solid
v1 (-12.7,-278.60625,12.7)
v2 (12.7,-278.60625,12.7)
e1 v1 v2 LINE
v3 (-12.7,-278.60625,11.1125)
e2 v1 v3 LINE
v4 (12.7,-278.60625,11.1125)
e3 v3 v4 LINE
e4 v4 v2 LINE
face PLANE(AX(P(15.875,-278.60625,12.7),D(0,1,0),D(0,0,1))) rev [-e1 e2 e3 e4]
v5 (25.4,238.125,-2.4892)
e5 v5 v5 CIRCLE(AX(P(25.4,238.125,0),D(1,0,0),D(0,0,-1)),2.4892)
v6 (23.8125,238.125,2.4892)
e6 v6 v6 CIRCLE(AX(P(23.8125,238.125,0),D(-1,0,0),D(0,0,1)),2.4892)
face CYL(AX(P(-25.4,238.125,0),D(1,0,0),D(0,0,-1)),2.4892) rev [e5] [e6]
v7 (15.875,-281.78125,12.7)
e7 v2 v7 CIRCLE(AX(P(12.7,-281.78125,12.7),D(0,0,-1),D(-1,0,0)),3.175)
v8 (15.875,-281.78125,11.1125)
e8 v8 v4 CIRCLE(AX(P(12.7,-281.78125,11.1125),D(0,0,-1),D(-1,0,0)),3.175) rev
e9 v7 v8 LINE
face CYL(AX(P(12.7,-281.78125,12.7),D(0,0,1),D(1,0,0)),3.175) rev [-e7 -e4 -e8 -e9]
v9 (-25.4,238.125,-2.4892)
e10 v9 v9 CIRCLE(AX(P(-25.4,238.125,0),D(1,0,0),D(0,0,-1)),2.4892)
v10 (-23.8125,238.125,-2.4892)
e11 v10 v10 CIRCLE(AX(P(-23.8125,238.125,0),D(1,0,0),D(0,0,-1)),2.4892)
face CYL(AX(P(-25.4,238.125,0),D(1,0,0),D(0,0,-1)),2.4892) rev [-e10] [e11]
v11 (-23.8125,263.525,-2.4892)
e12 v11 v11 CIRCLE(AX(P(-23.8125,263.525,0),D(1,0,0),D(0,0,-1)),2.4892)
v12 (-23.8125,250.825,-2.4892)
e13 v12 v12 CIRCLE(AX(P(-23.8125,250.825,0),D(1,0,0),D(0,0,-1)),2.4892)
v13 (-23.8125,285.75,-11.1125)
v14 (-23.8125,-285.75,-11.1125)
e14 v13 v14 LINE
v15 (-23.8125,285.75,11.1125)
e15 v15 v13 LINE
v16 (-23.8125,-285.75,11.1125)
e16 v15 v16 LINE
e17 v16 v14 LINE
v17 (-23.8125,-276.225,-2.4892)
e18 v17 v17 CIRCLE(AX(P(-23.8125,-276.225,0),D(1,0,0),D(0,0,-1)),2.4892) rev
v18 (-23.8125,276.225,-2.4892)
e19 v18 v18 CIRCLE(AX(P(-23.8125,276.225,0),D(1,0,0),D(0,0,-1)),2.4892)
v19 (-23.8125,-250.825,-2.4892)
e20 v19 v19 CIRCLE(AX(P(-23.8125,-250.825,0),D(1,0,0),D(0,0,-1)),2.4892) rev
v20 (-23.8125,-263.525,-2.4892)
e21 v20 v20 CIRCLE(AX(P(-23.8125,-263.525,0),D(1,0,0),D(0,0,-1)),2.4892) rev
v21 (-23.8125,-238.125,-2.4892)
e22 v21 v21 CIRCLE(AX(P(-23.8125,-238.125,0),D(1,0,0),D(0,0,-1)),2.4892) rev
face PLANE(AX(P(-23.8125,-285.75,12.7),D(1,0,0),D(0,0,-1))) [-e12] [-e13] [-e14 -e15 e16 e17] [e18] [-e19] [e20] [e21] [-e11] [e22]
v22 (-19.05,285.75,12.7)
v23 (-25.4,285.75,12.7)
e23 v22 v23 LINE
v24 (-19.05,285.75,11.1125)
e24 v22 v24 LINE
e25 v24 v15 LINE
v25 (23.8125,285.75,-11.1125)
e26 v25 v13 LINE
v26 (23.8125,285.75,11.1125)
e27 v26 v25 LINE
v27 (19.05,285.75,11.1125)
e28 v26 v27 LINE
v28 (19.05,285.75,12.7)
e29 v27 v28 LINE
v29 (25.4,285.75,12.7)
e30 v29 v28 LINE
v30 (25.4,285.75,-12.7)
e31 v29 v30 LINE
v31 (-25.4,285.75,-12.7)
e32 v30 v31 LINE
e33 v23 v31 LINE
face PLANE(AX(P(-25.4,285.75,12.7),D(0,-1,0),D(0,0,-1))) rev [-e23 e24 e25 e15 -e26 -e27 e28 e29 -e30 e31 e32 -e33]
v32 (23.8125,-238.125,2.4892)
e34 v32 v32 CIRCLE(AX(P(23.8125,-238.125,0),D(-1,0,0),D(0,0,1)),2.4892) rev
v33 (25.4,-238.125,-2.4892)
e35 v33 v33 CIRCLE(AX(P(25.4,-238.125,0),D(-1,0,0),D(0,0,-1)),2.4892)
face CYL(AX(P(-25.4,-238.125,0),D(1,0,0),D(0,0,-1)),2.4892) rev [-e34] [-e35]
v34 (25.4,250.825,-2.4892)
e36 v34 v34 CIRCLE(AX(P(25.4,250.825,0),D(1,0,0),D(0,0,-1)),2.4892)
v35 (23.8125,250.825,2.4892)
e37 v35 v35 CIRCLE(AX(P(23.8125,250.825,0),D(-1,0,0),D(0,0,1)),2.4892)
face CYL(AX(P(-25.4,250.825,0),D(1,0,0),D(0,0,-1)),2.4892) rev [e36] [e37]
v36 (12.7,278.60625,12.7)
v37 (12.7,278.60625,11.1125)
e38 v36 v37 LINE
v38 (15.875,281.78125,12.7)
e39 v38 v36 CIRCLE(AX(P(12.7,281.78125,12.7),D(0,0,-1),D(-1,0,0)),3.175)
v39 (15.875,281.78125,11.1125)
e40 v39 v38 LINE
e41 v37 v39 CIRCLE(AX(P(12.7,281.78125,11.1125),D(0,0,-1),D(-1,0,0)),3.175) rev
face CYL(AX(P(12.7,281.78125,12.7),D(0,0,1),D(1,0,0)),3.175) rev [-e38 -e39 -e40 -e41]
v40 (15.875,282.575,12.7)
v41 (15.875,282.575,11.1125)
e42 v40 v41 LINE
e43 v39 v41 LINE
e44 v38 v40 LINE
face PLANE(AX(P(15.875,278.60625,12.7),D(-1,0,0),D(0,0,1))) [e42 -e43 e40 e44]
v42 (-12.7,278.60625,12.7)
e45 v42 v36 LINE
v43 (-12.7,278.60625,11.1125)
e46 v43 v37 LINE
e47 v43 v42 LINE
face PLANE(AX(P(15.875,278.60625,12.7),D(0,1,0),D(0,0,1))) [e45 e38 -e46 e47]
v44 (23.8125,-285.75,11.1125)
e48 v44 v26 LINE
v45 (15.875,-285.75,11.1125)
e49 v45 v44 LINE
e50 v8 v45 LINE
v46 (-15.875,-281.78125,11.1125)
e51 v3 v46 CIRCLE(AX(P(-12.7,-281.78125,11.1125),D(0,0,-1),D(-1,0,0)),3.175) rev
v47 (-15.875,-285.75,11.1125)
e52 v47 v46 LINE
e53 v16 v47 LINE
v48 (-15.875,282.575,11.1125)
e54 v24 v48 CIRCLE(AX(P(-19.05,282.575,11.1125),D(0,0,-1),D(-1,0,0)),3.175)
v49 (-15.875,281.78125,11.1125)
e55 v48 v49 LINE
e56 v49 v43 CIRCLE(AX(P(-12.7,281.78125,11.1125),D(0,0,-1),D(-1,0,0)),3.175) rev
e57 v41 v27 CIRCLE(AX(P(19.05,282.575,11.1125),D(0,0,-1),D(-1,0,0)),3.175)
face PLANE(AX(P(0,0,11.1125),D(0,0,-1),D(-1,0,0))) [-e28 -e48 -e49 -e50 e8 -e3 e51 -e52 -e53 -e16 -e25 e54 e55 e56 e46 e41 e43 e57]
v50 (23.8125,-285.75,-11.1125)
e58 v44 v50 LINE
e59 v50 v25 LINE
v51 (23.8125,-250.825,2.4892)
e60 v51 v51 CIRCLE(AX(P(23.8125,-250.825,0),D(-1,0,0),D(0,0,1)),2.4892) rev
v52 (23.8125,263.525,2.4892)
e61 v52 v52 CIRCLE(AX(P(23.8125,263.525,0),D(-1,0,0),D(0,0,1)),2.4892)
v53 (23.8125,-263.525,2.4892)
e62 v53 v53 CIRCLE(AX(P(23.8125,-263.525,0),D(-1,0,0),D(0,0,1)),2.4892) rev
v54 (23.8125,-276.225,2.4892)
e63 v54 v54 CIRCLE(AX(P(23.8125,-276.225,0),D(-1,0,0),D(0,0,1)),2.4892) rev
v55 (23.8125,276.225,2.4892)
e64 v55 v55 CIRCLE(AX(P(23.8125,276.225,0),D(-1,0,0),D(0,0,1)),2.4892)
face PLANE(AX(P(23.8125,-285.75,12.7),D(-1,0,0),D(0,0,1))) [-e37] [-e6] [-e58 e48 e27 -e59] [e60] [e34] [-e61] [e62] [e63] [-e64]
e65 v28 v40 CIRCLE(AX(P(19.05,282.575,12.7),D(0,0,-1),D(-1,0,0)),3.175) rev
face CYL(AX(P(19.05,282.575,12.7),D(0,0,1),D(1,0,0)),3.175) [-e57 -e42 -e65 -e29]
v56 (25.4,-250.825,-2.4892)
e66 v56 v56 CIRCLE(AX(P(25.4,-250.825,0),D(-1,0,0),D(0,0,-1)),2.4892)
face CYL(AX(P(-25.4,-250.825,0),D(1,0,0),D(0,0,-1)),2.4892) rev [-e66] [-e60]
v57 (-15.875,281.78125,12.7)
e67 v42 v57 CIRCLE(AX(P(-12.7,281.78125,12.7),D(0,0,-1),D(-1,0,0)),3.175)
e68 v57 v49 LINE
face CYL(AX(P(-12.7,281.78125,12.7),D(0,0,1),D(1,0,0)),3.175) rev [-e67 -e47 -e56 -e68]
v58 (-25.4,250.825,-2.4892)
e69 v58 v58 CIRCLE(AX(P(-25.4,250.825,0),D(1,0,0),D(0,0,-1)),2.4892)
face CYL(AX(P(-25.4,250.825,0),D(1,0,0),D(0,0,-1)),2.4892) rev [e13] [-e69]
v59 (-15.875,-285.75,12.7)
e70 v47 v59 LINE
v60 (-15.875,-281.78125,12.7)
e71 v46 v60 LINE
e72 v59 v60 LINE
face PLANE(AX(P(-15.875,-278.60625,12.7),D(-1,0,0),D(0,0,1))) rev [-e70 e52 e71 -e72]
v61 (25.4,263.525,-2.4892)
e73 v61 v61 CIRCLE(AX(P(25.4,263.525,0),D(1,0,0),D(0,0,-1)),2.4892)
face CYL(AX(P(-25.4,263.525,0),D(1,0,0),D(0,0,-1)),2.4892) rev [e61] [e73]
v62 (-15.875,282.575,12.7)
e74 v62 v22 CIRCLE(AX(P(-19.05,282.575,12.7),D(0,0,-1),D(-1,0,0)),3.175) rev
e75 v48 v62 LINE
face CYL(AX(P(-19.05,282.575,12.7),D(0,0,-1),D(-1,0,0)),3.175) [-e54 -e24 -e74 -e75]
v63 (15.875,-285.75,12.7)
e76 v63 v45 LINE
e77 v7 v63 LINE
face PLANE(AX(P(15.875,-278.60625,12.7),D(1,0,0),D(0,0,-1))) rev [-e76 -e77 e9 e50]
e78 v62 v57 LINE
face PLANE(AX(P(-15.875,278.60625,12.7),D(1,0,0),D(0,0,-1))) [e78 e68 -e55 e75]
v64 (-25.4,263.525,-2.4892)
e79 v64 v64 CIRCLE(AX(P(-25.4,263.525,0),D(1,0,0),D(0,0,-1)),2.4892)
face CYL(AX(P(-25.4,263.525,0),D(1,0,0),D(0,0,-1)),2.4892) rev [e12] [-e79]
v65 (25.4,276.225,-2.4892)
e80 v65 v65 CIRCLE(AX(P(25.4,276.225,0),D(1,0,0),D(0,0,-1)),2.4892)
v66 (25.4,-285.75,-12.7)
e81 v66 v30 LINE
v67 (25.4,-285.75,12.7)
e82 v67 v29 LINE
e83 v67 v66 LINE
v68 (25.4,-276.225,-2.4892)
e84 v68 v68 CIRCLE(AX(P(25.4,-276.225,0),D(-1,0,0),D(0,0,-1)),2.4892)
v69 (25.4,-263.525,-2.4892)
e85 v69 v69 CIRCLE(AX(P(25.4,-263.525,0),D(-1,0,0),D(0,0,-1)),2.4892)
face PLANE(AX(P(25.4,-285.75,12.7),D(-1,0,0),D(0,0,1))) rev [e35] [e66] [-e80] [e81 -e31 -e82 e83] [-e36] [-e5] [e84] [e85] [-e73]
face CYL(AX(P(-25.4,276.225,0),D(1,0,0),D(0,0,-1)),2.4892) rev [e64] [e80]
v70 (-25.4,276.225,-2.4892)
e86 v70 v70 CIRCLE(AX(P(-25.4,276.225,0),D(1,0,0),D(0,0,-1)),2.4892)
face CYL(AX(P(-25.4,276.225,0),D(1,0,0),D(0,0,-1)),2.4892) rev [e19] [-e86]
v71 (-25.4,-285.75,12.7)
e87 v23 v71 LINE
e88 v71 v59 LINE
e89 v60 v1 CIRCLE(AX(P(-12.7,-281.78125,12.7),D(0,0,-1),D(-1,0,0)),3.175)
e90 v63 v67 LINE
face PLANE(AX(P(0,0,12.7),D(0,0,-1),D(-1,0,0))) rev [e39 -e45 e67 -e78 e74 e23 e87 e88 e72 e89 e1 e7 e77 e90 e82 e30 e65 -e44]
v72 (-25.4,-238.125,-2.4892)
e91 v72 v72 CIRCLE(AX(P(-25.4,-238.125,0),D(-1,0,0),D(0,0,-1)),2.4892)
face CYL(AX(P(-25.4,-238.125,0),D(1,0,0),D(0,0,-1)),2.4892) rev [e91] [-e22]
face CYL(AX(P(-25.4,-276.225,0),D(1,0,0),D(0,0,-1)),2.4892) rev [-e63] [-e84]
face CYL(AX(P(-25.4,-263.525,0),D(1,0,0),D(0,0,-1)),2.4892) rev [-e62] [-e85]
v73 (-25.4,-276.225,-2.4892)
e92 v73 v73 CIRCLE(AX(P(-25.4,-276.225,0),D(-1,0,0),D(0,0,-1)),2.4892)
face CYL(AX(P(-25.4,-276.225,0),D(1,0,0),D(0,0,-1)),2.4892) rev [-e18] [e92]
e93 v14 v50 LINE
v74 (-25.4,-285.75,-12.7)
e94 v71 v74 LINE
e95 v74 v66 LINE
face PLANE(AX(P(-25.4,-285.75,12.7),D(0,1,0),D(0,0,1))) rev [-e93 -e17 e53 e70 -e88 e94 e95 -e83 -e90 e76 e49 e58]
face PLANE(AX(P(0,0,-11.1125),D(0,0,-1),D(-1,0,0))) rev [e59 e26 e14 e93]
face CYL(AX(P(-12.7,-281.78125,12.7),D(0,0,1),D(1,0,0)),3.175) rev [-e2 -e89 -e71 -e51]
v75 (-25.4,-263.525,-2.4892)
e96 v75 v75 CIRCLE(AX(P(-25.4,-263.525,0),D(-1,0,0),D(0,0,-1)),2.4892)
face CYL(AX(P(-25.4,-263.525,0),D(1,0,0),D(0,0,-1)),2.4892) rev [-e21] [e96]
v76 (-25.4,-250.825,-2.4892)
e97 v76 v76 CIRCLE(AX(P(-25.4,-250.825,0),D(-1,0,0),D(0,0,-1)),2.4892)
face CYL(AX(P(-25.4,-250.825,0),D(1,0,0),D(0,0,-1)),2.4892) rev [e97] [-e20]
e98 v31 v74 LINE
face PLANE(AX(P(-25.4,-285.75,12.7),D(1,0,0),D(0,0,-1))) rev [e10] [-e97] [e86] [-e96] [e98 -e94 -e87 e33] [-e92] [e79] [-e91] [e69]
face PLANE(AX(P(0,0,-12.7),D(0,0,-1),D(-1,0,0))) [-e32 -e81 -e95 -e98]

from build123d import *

# Parameters (mm, degrees)
SKETCH1_W           = 50.8
SKETCH1_H           = 571.5
BOSS_EXTRUDE1_DEPTH = 12.7
SHELL1_T            = -1.5875
SKETCH5_W           = 31.75
SKETCH5_H           = 26.9875
CUT_EXTRUDE4_DEPTH  = 288.157643987
FILLET2_R           = 3.175
SKETCH3_R           = 2.4892
CUT_EXTRUDE5_DEPTH  = 288.157643987
MIRROR2_START       = 11.1125
MIRROR2_DEPTH       = 1.5875
MIRROR2_START_2     = -25.4
MIRROR2_2_OUTLINE_R = 2.4892
MIRROR2_2_DEPTH     = 50.8


# Read off the part's stored shape, not the designer's step: Mirror2
with BuildPart() as part:
    # Sketch1 → Boss-Extrude1 (new, symmetric)
    with BuildSketch(Plane.XY):
        Rectangle(SKETCH1_W, SKETCH1_H)
    extrude(amount=BOSS_EXTRUDE1_DEPTH, both=True)

    # Shell1
    shell1_openings = [part.faces().sort_by_distance(p)[0] for p in [
        (0, -285.75, 0),
        (0, 285.75, 0),
    ]]
    offset(amount=SHELL1_T, openings=shell1_openings, kind=Kind.INTERSECTION)

    # Sketch5 → Cut-Extrude4 (cut, through all)
    with BuildSketch(Plane.XY):
        with Locations((0, 292.1)):
            Rectangle(SKETCH5_W, SKETCH5_H)
    extrude(amount=CUT_EXTRUDE4_DEPTH, mode=Mode.SUBTRACT)

    # Fillet2
    fillet2_edges = [part.edges().sort_by_distance(p)[0] for p in [
        (15.875, 278.60625, 11.90625),
        (15.875, 285.75, 11.90625),
        (-15.875, 285.75, 11.90625),
        (-15.875, 278.60625, 11.90625),
    ]]
    fillet(fillet2_edges, radius=FILLET2_R)

    # Sketch3 → Cut-Extrude5 (cut, symmetric)
    with BuildSketch(Plane(origin=(0, 0, 0), x_dir=(0, 0, -1), z_dir=(1, 0, 0))):
        with Locations((0, 276.225)):
            Circle(SKETCH3_R)
        with Locations((0, 263.525)):
            Circle(SKETCH3_R)
        with Locations((0, 250.825)):
            Circle(SKETCH3_R)
        with Locations((0, 238.125)):
            Circle(SKETCH3_R)
    extrude(amount=CUT_EXTRUDE5_DEPTH, both=True, mode=Mode.SUBTRACT)

    # Mirror2 outline → Mirror2 (cut)
    with BuildSketch(Plane.XY.offset(MIRROR2_START)):
        with BuildLine():
            Line((-15.875, -285.75), (15.875, -285.75))
            Line((15.875, -285.75), (15.875, -281.78125))
            ThreePointArc((15.875, -281.78125), (14.94506403, -279.53618597), (12.7, -278.60625))
            Line((12.7, -278.60625), (-12.7, -278.60625))
            ThreePointArc((-12.7, -278.60625), (-14.94506403, -279.53618597), (-15.875, -281.78125))
            Line((-15.875, -281.78125), (-15.875, -285.75))
        make_face()
    extrude(amount=MIRROR2_DEPTH, mode=Mode.SUBTRACT)

    # Mirror2 2 outline → Mirror2 2 (cut)
    with BuildSketch(Plane.YZ.offset(MIRROR2_START_2)):
        with Locations((-238.125, 0)):
            Circle(MIRROR2_2_OUTLINE_R)
        with Locations((-250.825, 0)):
            Circle(MIRROR2_2_OUTLINE_R)
        with Locations((-263.525, 0)):
            Circle(MIRROR2_2_OUTLINE_R)
        with Locations((-276.225, 0)):
            Circle(MIRROR2_2_OUTLINE_R)
    extrude(amount=MIRROR2_2_DEPTH, mode=Mode.SUBTRACT)


solid = part.part
